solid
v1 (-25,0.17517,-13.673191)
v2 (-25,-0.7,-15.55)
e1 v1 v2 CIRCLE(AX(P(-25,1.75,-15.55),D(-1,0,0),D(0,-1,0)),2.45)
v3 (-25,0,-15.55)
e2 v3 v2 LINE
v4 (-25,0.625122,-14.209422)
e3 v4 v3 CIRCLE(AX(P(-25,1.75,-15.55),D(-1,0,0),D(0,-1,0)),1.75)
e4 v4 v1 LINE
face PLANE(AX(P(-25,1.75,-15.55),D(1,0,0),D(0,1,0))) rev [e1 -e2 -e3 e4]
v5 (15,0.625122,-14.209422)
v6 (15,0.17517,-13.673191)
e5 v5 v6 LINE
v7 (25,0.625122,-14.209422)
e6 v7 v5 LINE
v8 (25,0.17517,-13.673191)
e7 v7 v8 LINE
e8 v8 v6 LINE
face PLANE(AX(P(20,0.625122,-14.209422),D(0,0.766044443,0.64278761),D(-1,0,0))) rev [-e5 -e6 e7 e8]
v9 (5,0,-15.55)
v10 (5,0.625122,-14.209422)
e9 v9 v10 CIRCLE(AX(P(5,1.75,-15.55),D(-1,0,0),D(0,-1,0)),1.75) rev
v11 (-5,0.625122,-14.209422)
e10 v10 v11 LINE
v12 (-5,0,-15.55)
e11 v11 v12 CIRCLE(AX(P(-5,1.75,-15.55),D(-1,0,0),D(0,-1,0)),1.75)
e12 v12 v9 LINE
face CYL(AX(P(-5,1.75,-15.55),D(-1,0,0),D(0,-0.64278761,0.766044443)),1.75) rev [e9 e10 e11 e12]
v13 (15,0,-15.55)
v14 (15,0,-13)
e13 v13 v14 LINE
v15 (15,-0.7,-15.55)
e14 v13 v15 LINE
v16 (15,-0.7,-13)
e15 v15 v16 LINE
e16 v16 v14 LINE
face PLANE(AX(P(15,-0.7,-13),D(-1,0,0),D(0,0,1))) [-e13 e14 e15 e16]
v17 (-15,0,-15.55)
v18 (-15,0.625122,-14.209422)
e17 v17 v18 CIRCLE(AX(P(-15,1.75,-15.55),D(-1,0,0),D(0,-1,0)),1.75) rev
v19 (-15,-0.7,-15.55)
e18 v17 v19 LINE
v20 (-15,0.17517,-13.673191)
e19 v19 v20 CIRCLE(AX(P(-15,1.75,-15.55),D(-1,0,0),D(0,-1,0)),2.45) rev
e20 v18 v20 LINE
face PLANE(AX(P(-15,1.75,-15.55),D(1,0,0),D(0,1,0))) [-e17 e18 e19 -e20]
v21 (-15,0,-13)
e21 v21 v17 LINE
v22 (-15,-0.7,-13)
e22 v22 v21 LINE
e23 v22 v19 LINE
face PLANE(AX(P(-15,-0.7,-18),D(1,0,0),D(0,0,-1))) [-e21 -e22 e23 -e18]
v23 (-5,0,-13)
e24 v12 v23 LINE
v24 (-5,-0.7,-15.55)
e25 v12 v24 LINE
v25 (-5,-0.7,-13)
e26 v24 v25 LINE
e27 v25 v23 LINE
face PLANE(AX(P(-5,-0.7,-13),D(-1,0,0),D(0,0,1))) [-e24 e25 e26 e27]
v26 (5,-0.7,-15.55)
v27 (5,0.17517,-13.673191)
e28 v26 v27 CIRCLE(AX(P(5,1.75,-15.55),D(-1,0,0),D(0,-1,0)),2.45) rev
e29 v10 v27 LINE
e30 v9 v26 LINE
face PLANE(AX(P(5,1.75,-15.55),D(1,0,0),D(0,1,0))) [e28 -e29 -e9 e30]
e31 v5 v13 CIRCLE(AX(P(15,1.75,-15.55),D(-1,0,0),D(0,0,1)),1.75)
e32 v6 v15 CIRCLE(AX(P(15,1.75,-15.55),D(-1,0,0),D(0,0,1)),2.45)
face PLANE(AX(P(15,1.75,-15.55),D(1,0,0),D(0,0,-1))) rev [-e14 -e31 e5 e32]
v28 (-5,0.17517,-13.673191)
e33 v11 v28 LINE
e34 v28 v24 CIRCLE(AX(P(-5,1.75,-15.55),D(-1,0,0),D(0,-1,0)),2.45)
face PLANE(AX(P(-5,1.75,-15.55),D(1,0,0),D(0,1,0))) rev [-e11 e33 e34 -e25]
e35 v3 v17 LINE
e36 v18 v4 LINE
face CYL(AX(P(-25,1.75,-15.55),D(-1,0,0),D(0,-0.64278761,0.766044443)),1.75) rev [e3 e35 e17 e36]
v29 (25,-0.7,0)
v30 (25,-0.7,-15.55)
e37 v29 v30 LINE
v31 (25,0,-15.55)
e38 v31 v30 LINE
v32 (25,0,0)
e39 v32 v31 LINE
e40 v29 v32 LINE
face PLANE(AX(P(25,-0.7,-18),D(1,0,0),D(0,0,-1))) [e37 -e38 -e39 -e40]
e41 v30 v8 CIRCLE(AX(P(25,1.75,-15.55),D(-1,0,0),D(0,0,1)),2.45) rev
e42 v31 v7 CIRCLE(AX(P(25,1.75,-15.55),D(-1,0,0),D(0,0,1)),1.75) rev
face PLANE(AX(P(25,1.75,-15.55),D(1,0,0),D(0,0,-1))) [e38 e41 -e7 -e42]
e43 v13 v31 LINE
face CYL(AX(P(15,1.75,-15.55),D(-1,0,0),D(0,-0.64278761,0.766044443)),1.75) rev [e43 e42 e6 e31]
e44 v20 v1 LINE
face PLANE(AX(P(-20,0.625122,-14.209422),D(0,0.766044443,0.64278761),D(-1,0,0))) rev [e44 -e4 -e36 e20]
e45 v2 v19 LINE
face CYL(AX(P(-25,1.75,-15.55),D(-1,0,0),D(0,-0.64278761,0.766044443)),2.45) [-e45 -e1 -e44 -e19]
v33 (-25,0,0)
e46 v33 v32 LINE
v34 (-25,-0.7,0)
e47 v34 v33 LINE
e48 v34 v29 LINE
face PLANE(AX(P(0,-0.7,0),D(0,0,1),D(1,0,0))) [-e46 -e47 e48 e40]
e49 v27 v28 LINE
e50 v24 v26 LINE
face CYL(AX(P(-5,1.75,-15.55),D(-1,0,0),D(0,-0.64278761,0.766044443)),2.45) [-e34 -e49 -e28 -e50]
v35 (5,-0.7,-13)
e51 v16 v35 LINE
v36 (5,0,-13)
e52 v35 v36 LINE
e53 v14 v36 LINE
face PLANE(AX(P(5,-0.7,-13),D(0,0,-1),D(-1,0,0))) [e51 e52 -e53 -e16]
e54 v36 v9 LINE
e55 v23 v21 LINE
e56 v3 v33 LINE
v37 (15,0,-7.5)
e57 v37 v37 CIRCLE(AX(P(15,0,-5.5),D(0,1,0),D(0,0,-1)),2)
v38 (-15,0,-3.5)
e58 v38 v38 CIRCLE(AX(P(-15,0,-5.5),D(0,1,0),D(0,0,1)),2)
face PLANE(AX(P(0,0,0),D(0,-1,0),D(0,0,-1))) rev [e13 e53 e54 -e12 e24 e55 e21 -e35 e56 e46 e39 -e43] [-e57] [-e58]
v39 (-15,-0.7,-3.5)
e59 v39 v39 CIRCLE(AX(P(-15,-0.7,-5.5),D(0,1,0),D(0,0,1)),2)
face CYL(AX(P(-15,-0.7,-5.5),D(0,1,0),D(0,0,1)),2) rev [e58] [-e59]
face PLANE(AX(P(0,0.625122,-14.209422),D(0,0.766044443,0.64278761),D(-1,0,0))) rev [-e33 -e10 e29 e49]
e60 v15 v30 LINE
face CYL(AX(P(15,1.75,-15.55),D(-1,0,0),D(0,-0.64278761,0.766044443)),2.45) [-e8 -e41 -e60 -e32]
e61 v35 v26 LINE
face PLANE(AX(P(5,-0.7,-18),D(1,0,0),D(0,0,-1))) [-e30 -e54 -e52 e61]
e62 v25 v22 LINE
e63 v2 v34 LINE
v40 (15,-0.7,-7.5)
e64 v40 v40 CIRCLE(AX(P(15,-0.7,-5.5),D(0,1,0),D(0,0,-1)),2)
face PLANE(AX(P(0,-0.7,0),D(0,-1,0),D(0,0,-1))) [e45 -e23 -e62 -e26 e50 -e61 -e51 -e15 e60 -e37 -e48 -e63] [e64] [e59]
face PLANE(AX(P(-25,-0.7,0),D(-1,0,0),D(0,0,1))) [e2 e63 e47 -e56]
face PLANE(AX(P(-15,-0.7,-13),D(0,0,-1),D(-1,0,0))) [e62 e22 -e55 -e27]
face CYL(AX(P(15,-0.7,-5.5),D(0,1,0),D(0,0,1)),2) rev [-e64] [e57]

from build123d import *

# Parameters (mm, degrees)
SKETCH_1_R             = 2
SM_BASE_FLANGE_1_DEPTH = 0.7
OTHER_START            = -25
OTHER_1_DEPTH          = 50
OTHER_1_2_DEPTH        = 10
OTHER_START_2          = -5
OTHER_1_3_DEPTH        = 10
OTHER_START_3          = 15
OTHER_1_4_DEPTH        = 10


# Read off the part's stored shape, not the designer's step: 褶边1
# Sheet-metal steps are written as plain solids
with BuildPart() as part:
    # Sketch 1 → 基体-法兰1 (new body)
    with BuildSketch(Plane(origin=(0, 0, 0), x_dir=(1, 0, 0), z_dir=(0, 1, 0))):
        Polygon((0, 0), (-25, 0), (-25, 18), (-15, 18), (-15, 13), (-5, 13), (-5, 18), (5, 18), (5, 13), (15, 13), (15, 18), (25, 18), (25, 0), align=None)
        with Locations(Location((-15, 5.5, 0), (0, 0, 270))):
            Circle(SKETCH_1_R, mode=Mode.SUBTRACT)
        with Locations(Location((15, 5.5, 0), (0, 0, 90))):
            Circle(SKETCH_1_R, mode=Mode.SUBTRACT)
    extrude(amount=-SM_BASE_FLANGE_1_DEPTH)

    # Other 1 outline → Other 1 (cut)
    with BuildSketch(Plane.YZ.offset(OTHER_START)):
        with BuildLine():
            Line((0, -18), (0, -17.264642819))
            ThreePointArc((0, -17.264642819), (-0.518259244, -16.476012959), (-0.7, -15.55))
            Line((-0.7, -15.55), (-0.7, -18))
            Line((-0.7, -18), (0, -18))
        make_face()
    extrude(amount=OTHER_1_DEPTH, mode=Mode.SUBTRACT)

    # Other 1 2 outline → Other 1 2 (add)
    with BuildSketch(Plane.YZ.offset(OTHER_START)):
        with BuildLine():
            Line((0.175170356, -13.673191114), (0.625121683, -14.209422225))
            ThreePointArc((0.625121683, -14.209422225), (3.336038627, -16.289581958), (0, -15.55))
            Line((0, -15.55), (0, -17.264642819))
            ThreePointArc((0, -17.264642819), (4.197091003, -15.669355023), (0.175170356, -13.673191114))
        make_face()
    extrude(amount=OTHER_1_2_DEPTH)

    # Other 1 3 outline → Other 1 3 (add)
    with BuildSketch(Plane.YZ.offset(OTHER_START_2)):
        with BuildLine():
            Line((0.175170356, -13.673191114), (0.625121683, -14.209422225))
            ThreePointArc((0.625121683, -14.209422225), (3.336038627, -16.289581958), (0, -15.55))
            Line((0, -15.55), (0, -17.264642819))
            ThreePointArc((0, -17.264642819), (4.197091003, -15.669355023), (0.175170356, -13.673191114))
        make_face()
    extrude(amount=OTHER_1_3_DEPTH)

    # Other 1 4 outline → Other 1 4 (add)
    with BuildSketch(Plane.YZ.offset(OTHER_START_3)):
        with BuildLine():
            Line((0.175170356, -13.673191114), (0.625121683, -14.209422225))
            ThreePointArc((0.625121683, -14.209422225), (3.336038627, -16.289581958), (0, -15.55))
            Line((0, -15.55), (0, -17.264642819))
            ThreePointArc((0, -17.264642819), (4.197091003, -15.669355023), (0.175170356, -13.673191114))
        make_face()
    extrude(amount=OTHER_1_4_DEPTH)


solid = part.part
